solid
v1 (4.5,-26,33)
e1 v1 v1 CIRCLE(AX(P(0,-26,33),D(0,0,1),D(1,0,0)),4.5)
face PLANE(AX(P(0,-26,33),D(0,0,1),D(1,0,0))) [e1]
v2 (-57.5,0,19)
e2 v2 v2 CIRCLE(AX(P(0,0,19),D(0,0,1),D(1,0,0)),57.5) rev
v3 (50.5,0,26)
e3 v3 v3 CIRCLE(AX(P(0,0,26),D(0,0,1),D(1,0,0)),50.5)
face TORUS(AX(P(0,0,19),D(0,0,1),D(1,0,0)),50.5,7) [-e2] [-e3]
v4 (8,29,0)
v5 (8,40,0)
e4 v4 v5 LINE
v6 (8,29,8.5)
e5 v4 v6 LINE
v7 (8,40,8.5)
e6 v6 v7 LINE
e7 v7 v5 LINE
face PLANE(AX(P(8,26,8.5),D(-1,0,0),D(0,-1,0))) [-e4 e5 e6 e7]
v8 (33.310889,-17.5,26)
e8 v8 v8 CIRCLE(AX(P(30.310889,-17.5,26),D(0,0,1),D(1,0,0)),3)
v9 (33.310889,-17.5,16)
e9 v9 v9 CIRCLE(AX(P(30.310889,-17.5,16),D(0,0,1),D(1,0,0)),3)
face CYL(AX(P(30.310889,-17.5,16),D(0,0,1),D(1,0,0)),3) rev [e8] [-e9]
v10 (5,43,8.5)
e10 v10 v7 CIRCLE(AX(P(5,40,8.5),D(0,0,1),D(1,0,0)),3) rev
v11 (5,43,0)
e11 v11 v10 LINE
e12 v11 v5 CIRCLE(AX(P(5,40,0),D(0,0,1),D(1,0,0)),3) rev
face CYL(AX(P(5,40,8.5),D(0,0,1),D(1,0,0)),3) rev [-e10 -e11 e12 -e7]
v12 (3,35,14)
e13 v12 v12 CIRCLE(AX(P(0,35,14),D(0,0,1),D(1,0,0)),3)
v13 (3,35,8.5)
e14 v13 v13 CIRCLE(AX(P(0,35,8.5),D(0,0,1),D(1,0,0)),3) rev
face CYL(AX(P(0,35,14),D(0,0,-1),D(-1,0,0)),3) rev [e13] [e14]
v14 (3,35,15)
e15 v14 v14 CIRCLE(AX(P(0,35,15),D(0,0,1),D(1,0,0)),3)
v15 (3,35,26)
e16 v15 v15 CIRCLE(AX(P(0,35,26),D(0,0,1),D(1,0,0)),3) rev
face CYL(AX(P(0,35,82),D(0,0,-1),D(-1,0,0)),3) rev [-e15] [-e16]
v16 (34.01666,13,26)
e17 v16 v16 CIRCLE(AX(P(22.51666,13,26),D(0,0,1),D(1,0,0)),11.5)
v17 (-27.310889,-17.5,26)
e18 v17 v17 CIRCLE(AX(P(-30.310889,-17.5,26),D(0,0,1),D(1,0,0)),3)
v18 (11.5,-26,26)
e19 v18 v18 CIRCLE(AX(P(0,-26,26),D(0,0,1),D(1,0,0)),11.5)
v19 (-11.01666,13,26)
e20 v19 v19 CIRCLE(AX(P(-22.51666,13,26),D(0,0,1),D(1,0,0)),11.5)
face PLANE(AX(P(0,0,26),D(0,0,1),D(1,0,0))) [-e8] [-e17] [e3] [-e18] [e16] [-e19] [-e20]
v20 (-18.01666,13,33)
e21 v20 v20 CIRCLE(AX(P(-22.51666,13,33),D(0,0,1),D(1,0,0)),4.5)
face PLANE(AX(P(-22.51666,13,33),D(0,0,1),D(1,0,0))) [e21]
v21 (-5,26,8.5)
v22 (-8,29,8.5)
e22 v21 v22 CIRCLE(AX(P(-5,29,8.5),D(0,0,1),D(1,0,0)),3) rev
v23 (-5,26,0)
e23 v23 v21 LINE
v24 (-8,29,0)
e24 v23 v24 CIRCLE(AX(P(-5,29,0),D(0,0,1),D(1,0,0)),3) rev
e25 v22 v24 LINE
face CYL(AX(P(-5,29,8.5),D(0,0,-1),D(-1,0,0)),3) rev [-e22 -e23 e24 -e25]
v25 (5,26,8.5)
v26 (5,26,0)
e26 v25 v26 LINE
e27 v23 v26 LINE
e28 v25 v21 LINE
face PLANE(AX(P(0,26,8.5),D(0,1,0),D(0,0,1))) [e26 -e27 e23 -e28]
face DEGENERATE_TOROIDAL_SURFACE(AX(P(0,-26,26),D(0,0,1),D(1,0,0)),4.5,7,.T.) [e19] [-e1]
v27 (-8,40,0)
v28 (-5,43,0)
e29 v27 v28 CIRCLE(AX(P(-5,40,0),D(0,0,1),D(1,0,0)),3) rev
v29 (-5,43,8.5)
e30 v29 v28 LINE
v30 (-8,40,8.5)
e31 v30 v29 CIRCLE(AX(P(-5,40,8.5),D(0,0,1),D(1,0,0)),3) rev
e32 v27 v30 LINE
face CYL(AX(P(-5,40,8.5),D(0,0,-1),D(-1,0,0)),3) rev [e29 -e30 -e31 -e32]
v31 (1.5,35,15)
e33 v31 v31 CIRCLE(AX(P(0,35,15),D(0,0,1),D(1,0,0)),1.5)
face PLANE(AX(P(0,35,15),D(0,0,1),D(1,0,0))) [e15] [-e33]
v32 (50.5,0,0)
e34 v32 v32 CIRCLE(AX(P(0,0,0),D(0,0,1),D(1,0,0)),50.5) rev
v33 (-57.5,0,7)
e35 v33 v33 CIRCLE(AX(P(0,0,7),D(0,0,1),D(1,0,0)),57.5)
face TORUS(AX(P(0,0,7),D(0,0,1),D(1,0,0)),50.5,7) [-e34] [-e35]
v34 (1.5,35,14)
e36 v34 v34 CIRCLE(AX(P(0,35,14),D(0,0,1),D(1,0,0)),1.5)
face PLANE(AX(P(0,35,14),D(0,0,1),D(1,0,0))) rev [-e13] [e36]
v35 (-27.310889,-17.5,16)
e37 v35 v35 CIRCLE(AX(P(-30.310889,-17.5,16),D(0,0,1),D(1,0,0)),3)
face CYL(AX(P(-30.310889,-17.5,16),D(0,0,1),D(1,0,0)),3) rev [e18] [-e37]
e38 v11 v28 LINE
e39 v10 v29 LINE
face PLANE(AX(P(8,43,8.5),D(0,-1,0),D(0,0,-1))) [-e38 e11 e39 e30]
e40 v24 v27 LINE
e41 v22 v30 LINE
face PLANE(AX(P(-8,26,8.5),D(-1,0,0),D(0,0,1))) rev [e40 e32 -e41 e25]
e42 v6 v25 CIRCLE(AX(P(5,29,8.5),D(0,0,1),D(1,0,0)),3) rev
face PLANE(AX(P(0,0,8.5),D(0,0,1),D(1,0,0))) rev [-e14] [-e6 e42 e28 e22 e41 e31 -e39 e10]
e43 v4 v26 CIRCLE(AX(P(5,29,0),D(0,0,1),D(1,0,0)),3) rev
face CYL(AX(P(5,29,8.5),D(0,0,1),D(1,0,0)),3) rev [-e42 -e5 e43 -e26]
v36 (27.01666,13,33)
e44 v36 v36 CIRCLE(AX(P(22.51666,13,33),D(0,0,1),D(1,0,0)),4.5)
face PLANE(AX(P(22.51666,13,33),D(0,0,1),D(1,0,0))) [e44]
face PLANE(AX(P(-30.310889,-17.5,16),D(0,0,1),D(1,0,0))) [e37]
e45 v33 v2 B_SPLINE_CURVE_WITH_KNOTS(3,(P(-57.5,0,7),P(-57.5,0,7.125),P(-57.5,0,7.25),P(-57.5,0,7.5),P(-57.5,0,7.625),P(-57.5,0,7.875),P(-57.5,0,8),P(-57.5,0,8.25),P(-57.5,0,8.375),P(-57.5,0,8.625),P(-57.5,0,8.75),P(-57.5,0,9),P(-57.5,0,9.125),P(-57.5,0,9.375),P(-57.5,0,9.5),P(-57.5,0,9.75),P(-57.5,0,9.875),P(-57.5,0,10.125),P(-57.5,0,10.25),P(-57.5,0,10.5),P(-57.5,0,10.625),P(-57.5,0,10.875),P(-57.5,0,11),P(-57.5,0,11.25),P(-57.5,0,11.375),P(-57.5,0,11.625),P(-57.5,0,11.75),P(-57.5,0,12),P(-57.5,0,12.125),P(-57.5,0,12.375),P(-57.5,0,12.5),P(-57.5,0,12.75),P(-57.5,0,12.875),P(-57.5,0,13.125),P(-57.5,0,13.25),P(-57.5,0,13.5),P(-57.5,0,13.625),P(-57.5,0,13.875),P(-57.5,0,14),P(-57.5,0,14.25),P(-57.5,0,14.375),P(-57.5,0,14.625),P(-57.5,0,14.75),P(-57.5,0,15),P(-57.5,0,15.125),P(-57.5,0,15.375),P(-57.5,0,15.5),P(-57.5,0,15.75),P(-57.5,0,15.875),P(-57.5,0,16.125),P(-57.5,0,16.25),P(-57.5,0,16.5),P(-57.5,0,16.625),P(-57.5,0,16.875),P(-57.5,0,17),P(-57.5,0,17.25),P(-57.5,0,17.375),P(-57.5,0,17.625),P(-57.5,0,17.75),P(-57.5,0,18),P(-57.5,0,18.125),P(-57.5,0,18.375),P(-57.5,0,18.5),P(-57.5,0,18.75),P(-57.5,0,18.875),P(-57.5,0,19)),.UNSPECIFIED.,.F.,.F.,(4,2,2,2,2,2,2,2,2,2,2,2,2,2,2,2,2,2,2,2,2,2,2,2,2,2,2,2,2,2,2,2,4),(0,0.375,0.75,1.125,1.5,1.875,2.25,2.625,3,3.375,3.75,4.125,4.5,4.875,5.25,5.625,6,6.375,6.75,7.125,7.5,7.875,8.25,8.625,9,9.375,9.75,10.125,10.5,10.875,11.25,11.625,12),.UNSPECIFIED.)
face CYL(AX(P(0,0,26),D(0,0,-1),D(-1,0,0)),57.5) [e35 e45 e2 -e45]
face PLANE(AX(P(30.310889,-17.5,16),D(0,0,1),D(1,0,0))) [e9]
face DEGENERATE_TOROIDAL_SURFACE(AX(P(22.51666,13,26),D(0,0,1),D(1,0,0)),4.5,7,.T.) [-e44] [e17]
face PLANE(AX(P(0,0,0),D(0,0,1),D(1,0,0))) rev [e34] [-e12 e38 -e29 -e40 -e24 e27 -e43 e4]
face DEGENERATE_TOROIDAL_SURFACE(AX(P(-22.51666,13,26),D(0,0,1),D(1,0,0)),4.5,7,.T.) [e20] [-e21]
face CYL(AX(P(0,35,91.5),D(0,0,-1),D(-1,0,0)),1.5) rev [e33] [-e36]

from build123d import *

# Parameters (mm, degrees)
SKETCH_1_R          = 57.5
EXTRUDE_1_DEPTH     = 26
FILLET_2_R          = 7
CUT_EXTRUDE_1_DEPTH = 8.5
SKETCH_3_R          = 1.5
CUT_EXTRUDE_3_DEPTH = 91.5
SKETCH_3_4_R        = 3
CUT_EXTRUDE_4_DEPTH = 14
CUT_EXTRUDE_START   = 15
SKETCH_3_6_R        = 3
CUT_EXTRUDE_5_DEPTH = 67
FILLET_10_R         = 3
FILLET_11_R         = 3
FILLET_12_R         = 3
FILLET_13_R         = 3
CUT_EXTRUDE_START_2 = 16
SKETCH_3_8_R        = 3
CUT_EXTRUDE_6_DEPTH = 10
EXTRUDE_START       = 26
SKETCH_3_21_R       = 11.5
EXTRUDE_3_DEPTH     = 7
FILLET_30_R         = 7
SKETCH_3_22_R       = 11.5
EXTRUDE_4_DEPTH     = 7
SKETCH_3_23_R       = 11.5
EXTRUDE_5_DEPTH     = 7
FILLET_32_R         = 7
FILLET_33_R         = 7


with BuildPart() as part:
    # Эскиз1 → Бобышка-Вытянуть1 (new body)
    with BuildSketch(Plane.XY):
        with Locations(Location((0, 0, 0), (0, 0, 180))):
            Circle(SKETCH_1_R)
    extrude(amount=EXTRUDE_1_DEPTH)

    # Скругление2
    fillet_2_edges = [part.edges().sort_by_distance(p)[0] for p in [
        (57.5, 0, 0),
        (57.5, 0, 26),
    ]]
    fillet(fillet_2_edges, radius=FILLET_2_R)

    # Эскиз2 → Вырез-Вытянуть1 (cut)
    with BuildSketch(Plane.XY):
        Polygon((0, 26), (-8, 26), (-8, 43), (8, 43), (8, 26), align=None)
    extrude(amount=CUT_EXTRUDE_1_DEPTH, mode=Mode.SUBTRACT)

    # Эскиз3 → Вырез-Вытянуть3 (cut)
    with BuildSketch(Plane.XY):
        with Locations((0, 35)):
            Circle(SKETCH_3_R)
    extrude(amount=CUT_EXTRUDE_3_DEPTH, mode=Mode.SUBTRACT)

    # Эскиз3<4> → Вырез-Вытянуть4 (cut)
    with BuildSketch(Plane.XY):
        with Locations((0, 35)):
            Circle(SKETCH_3_4_R)
    extrude(amount=CUT_EXTRUDE_4_DEPTH, mode=Mode.SUBTRACT)

    # Эскиз3<6> → Вырез-Вытянуть5 (cut)
    with BuildSketch(Plane.XY.offset(CUT_EXTRUDE_START)):
        with Locations((0, 35)):
            Circle(SKETCH_3_6_R)
    extrude(amount=CUT_EXTRUDE_5_DEPTH, mode=Mode.SUBTRACT)

    # Скругление10
    fillet_10_edges = [part.edges().sort_by_distance(p)[0] for p in [
        (8, 43, 4.25),
    ]]
    fillet(fillet_10_edges, radius=FILLET_10_R)

    # Скругление11
    fillet_11_edges = [part.edges().sort_by_distance(p)[0] for p in [
        (-8, 43, 4.25),
    ]]
    fillet(fillet_11_edges, radius=FILLET_11_R)

    # Скругление12
    fillet_12_edges = [part.edges().sort_by_distance(p)[0] for p in [
        (-8, 26, 4.25),
    ]]
    fillet(fillet_12_edges, radius=FILLET_12_R)

    # Скругление13
    fillet_13_edges = [part.edges().sort_by_distance(p)[0] for p in [
        (8, 26, 4.25),
    ]]
    fillet(fillet_13_edges, radius=FILLET_13_R)

    # Эскиз3<8> → Вырез-Вытянуть6 (cut)
    with BuildSketch(Plane.XY.offset(CUT_EXTRUDE_START_2)):
        with Locations((0, 35)):
            Circle(SKETCH_3_8_R)
        with Locations((30.310889132, -17.5)):
            Circle(SKETCH_3_8_R)
        with Locations((-30.310889132, -17.5)):
            Circle(SKETCH_3_8_R)
    extrude(amount=CUT_EXTRUDE_6_DEPTH, mode=Mode.SUBTRACT)

    # Эскиз3<21> → Бобышка-Вытянуть3 (add)
    with BuildSketch(Plane.XY.offset(EXTRUDE_START)):
        with Locations((-22.516660498, 13)):
            Circle(SKETCH_3_21_R)
    extrude(amount=EXTRUDE_3_DEPTH)

    # Скругление30
    fillet_30_edges = [part.edges().sort_by_distance(p)[0] for p in [
        (-34.016660498, 13, 33),
    ]]
    fillet(fillet_30_edges, radius=FILLET_30_R - 0.0001)  # a hair under: the kernel refuses the full size

    # Эскиз3<22> → Бобышка-Вытянуть4 (add)
    with BuildSketch(Plane.XY.offset(EXTRUDE_START)):
        with Locations((22.516660498, 13)):
            Circle(SKETCH_3_22_R)
    extrude(amount=EXTRUDE_4_DEPTH)

    # Эскиз3<23> → Бобышка-Вытянуть5 (add)
    with BuildSketch(Plane.XY.offset(EXTRUDE_START)):
        with Locations((0, -26)):
            Circle(SKETCH_3_23_R)
    extrude(amount=EXTRUDE_5_DEPTH)

    # Скругление32
    fillet_32_edges = [part.edges().sort_by_distance(p)[0] for p in [
        (11.016660498, 13, 33),
    ]]
    fillet(fillet_32_edges, radius=FILLET_32_R - 0.0001)  # a hair under: the kernel refuses the full size

    # Скругление33
    fillet_33_edges = [part.edges().sort_by_distance(p)[0] for p in [
        (-11.5, -26, 33),
    ]]
    fillet(fillet_33_edges, radius=FILLET_33_R - 0.0001)  # a hair under: the kernel refuses the full size


solid = part.part
